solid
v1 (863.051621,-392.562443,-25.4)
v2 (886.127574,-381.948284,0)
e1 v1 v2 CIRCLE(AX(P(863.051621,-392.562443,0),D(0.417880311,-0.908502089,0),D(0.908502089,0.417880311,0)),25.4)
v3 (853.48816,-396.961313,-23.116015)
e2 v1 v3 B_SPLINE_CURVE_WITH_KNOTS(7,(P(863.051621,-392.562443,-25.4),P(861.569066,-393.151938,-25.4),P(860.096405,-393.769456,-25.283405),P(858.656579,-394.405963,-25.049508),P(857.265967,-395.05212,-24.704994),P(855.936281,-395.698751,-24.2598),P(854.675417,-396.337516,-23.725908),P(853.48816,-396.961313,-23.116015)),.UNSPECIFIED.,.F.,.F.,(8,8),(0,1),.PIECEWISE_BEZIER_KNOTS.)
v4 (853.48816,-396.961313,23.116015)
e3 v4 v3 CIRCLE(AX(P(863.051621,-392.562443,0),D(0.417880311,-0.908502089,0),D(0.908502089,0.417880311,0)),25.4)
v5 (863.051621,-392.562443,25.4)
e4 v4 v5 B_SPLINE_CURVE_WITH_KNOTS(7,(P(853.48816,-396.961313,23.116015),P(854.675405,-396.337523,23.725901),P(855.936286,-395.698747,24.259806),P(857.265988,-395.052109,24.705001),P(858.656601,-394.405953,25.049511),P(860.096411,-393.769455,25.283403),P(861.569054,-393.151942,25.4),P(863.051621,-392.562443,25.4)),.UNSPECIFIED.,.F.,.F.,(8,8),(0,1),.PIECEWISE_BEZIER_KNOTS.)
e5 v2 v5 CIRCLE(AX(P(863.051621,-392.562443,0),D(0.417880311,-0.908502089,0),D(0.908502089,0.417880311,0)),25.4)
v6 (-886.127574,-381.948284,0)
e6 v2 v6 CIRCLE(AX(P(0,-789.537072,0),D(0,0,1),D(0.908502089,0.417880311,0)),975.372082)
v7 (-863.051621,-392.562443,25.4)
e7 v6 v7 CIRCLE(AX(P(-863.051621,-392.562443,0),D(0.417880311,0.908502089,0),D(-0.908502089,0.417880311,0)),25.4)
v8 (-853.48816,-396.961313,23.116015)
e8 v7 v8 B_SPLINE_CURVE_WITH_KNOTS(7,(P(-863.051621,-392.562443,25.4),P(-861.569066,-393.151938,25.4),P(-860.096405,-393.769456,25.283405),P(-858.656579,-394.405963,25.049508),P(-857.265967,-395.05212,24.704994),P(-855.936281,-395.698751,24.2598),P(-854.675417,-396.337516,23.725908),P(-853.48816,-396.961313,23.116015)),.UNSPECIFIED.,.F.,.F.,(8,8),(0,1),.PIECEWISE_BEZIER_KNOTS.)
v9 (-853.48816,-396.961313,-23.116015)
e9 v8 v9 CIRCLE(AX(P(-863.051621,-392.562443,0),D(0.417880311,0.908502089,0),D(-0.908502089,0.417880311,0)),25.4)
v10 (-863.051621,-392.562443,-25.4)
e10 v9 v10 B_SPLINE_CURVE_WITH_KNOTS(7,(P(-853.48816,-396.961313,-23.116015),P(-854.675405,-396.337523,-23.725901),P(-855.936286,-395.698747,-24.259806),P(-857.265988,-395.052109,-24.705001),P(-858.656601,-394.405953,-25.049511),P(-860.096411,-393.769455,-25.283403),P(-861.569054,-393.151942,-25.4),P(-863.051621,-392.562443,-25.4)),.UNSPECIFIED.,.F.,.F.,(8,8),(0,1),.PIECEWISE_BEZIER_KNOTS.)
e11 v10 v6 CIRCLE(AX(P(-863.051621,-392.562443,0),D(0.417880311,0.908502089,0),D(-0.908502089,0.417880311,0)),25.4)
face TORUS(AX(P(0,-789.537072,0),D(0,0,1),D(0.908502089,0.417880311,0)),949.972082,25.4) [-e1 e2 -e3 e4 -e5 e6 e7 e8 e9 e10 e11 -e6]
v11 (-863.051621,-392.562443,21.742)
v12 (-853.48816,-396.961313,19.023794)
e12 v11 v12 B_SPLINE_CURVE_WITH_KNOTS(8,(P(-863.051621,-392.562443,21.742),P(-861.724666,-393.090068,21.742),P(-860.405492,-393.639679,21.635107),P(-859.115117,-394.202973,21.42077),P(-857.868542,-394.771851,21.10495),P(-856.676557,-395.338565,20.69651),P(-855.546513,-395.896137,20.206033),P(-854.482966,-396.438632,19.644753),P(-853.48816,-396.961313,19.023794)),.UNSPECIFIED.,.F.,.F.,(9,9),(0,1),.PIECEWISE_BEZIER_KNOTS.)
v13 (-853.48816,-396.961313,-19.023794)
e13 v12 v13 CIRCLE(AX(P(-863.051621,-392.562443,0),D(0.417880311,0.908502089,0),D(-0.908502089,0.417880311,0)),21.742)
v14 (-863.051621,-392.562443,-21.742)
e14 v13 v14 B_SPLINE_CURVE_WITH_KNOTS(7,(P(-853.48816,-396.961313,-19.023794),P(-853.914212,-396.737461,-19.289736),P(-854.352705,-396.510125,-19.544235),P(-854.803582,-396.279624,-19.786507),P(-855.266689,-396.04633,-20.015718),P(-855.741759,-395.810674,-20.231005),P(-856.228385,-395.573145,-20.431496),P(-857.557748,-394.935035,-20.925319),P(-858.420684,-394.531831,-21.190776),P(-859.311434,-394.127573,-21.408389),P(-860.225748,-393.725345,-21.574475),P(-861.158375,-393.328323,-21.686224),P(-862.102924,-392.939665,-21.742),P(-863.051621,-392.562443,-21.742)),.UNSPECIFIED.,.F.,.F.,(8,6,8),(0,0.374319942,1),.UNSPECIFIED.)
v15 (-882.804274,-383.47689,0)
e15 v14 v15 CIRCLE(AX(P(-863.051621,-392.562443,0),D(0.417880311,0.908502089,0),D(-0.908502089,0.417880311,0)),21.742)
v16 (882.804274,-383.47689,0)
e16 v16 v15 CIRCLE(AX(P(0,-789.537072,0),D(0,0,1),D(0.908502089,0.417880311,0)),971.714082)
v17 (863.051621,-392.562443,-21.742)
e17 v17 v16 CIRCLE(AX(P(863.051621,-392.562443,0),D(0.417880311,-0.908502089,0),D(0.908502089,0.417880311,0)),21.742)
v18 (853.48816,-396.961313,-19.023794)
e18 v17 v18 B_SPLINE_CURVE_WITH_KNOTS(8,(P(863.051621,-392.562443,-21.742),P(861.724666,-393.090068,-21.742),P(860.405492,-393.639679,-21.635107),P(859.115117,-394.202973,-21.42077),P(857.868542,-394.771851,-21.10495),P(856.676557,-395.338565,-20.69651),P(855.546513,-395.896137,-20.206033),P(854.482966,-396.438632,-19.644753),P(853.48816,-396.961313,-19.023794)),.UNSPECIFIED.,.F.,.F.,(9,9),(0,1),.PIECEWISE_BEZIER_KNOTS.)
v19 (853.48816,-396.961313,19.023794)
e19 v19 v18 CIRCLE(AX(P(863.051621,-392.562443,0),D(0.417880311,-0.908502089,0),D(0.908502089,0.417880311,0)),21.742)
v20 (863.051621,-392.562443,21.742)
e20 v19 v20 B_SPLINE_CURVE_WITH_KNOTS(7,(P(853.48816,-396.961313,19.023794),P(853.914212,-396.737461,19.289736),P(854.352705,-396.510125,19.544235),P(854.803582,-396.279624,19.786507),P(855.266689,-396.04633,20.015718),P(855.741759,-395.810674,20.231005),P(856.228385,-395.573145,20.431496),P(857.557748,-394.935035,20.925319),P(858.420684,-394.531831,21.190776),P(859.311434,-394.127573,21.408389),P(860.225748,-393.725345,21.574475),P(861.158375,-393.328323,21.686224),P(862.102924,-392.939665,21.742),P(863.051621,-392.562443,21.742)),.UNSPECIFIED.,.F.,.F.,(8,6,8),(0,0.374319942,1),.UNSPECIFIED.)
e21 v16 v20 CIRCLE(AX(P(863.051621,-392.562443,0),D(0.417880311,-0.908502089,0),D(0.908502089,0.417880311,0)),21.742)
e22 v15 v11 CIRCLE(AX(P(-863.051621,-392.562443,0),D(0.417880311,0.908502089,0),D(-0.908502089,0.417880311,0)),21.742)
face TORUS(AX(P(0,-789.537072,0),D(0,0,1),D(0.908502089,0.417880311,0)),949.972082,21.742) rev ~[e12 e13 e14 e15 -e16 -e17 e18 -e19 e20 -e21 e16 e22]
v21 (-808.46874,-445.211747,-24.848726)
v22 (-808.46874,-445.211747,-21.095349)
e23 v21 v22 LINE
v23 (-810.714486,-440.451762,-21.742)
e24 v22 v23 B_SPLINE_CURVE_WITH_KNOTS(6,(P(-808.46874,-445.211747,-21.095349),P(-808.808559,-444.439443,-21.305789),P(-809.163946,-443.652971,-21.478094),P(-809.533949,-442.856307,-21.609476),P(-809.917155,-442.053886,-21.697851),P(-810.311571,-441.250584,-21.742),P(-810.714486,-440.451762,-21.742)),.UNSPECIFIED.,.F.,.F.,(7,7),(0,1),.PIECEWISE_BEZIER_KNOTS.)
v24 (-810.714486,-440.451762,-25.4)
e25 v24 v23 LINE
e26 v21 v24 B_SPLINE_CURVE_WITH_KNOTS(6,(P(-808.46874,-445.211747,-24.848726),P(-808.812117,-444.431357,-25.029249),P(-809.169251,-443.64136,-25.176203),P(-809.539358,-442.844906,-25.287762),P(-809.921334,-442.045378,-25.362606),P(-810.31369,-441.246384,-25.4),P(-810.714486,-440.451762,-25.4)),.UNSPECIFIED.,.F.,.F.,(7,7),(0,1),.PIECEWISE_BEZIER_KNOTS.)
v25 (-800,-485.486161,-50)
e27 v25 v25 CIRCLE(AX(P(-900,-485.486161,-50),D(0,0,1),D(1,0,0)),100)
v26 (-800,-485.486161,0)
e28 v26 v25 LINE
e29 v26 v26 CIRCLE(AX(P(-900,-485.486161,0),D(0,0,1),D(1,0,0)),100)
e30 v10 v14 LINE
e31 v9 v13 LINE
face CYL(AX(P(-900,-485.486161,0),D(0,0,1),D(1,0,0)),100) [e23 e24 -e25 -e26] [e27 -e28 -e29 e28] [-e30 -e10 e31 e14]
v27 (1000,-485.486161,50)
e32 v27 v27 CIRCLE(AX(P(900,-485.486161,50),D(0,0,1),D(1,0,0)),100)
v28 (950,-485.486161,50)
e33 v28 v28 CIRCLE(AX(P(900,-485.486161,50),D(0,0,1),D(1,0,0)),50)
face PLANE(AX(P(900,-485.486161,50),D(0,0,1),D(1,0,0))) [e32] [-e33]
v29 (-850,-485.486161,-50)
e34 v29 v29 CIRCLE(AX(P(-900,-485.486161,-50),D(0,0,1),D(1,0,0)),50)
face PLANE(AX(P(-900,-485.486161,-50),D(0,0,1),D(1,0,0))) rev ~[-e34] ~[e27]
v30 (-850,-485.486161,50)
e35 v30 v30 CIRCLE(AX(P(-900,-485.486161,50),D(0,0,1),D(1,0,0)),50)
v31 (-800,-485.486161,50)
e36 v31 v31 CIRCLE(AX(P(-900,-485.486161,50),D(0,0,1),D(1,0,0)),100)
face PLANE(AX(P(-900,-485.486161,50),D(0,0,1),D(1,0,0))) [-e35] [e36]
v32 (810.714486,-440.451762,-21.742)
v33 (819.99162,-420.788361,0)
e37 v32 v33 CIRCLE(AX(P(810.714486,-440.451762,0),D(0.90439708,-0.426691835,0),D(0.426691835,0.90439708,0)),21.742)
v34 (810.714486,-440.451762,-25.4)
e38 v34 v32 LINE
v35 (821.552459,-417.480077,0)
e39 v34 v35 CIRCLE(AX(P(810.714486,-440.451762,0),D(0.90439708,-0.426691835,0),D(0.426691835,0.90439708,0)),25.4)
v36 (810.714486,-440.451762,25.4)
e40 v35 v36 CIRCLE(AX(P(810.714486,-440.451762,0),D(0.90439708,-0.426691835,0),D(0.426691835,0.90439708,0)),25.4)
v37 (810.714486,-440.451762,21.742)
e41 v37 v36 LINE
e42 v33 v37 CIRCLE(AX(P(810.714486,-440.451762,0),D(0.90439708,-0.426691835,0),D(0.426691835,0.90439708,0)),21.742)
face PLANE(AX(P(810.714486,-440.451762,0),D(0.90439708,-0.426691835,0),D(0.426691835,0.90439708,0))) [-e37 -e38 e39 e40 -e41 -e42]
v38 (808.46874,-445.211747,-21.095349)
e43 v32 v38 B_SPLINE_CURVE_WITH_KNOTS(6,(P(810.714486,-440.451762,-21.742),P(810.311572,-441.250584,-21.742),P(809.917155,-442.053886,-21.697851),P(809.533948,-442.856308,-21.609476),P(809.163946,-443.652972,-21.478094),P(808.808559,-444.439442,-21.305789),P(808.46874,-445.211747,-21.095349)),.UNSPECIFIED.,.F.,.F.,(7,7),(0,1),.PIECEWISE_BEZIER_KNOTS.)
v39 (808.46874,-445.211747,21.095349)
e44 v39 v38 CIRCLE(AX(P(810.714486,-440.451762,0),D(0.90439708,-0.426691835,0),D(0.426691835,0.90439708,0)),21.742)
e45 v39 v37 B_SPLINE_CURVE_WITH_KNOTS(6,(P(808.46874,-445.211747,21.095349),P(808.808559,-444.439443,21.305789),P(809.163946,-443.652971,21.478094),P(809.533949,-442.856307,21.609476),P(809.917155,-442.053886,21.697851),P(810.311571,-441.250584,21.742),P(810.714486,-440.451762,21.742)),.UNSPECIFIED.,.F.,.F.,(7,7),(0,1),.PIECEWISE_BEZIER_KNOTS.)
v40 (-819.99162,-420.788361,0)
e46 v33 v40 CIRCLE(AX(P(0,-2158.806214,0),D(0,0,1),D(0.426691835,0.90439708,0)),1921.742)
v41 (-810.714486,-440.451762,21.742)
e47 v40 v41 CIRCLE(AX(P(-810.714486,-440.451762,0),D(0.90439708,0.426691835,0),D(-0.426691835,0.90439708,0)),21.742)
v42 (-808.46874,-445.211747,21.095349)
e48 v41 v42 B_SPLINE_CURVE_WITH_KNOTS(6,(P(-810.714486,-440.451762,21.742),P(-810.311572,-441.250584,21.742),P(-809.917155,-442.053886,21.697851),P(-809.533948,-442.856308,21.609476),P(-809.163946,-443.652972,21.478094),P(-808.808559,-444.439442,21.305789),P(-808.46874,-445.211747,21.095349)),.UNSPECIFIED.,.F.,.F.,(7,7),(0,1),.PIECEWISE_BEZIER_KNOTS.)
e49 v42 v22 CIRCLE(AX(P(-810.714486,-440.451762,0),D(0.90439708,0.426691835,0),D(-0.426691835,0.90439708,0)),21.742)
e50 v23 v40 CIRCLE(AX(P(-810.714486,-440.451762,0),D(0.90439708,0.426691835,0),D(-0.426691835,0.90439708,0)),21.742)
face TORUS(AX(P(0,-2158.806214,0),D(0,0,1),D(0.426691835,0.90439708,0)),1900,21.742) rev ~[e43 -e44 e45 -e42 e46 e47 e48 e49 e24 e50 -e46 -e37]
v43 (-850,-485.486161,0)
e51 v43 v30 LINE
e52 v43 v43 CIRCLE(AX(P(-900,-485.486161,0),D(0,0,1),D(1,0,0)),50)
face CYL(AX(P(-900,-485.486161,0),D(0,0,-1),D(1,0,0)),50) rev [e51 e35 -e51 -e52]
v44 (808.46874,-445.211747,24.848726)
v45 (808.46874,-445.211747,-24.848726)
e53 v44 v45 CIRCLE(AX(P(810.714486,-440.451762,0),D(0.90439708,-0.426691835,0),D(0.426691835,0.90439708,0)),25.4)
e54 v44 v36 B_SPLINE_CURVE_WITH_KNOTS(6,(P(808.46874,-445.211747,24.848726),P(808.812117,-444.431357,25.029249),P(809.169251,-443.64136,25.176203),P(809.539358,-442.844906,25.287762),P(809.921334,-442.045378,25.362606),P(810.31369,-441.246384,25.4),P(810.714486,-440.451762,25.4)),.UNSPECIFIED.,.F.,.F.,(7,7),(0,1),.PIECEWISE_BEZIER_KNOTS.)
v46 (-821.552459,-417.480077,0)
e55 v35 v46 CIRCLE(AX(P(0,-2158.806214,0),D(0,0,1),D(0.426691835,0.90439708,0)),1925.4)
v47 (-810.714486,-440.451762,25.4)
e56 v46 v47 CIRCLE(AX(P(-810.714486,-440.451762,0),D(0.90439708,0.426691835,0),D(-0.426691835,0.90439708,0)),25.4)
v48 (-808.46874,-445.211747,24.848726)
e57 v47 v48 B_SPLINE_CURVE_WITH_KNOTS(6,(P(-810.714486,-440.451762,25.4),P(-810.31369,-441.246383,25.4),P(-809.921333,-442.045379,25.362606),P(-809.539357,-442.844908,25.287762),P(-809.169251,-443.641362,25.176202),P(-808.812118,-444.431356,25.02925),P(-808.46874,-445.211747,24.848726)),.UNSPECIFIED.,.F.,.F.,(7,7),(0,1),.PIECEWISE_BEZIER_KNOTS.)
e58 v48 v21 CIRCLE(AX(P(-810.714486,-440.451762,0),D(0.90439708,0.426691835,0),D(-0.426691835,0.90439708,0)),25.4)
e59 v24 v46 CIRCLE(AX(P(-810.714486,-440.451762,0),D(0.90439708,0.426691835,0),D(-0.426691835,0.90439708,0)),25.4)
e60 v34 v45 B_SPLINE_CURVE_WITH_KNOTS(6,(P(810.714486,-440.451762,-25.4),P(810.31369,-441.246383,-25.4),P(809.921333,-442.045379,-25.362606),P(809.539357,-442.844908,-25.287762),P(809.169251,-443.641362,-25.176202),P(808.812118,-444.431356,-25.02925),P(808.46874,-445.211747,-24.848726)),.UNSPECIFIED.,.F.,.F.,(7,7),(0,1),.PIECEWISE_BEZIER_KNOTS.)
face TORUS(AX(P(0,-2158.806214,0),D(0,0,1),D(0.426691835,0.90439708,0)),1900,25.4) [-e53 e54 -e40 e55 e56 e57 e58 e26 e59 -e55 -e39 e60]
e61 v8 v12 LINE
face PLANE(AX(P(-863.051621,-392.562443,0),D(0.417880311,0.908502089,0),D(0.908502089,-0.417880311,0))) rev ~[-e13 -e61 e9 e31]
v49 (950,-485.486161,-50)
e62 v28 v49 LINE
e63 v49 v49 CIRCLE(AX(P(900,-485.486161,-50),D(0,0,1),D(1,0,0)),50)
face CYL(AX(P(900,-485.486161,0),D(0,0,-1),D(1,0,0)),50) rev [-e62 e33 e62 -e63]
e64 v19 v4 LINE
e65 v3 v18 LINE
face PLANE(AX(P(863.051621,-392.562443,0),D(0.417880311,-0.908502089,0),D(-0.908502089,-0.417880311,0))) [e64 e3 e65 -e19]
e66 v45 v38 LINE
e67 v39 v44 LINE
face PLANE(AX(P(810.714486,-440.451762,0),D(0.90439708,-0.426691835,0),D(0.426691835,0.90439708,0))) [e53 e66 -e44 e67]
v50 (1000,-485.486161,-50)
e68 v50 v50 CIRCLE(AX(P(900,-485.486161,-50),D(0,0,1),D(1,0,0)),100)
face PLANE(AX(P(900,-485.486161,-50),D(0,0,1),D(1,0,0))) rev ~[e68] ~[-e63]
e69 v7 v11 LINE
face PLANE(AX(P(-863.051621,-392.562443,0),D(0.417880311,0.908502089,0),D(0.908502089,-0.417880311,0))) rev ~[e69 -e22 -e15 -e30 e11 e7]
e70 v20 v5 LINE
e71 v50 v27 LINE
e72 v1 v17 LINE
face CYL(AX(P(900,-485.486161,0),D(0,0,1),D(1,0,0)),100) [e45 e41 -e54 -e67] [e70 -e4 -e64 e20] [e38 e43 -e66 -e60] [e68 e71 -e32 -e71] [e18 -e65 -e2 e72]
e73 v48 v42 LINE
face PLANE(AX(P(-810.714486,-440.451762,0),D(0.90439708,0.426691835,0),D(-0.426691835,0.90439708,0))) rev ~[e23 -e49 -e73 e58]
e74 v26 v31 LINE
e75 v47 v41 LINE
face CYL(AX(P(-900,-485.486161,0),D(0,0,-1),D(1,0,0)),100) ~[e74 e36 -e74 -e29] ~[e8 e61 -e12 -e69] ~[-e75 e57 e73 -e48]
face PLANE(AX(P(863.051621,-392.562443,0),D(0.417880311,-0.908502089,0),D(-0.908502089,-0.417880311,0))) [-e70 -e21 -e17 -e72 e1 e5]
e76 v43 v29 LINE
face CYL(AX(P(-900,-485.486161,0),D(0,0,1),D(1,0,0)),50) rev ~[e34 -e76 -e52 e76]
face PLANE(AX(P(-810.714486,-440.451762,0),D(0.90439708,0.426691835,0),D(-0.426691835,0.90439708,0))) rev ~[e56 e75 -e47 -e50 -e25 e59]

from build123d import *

# Parameters (mm, degrees)
F2_R     = 25.4
F2_R_2   = 21.742
F3_R     = 25.4
F3_R_2   = 21.742
F6_R     = 100
F6_R_2   = 50
F7_DEPTH = 50


with BuildPart() as f4:
    # F4: sweep along a path in F1
    with BuildLine(Plane.XY) as f4_path:
        ThreePointArc((810.7144863791, -440.4517624252), (0, -258.8062140954), (-810.7144863791, -440.4517624252))
    # F2 (on Right) → F4 (sweep)
    with BuildSketch(Plane.YZ):
        with Locations((-258.8062140954, 0)):
            Circle(F2_R)
        with Locations((-258.8062140954, 0)):
            Circle(F2_R_2, mode=Mode.SUBTRACT)
    sweep(path=f4_path.line)



with BuildPart() as f5:
    # F5: sweep along a path in F1
    with BuildLine(Plane.XY) as f5_path:
        ThreePointArc((863.0516210993, -392.5624434058), (0, 160.4350098154), (-863.0516210993, -392.5624434058))
    # F3 (on Right) → F5 (sweep)
    with BuildSketch(Plane.YZ):
        with Locations((160.4350098154, 0)):
            Circle(F3_R)
        with Locations((160.4350098154, 0)):
            Circle(F3_R_2, mode=Mode.SUBTRACT)
    sweep(path=f5_path.line)


with BuildPart() as f4_1:
    add(f4.part)

    add(f5.part)  # F7 merges F5
    # F6 (on Top) → F7 (join, symmetric)
    with BuildSketch(Plane.XY):
        with Locations((-900, -485.4861610273)):
            Circle(F6_R)
        with Locations((-900, -485.4861610273)):
            Circle(F6_R_2, mode=Mode.SUBTRACT)
        with Locations((900, -485.4861610273)):
            Circle(F6_R)
        with Locations((900, -485.4861610273)):
            Circle(F6_R_2, mode=Mode.SUBTRACT)
    extrude(amount=F7_DEPTH, both=True)


solid = f4_1.part
